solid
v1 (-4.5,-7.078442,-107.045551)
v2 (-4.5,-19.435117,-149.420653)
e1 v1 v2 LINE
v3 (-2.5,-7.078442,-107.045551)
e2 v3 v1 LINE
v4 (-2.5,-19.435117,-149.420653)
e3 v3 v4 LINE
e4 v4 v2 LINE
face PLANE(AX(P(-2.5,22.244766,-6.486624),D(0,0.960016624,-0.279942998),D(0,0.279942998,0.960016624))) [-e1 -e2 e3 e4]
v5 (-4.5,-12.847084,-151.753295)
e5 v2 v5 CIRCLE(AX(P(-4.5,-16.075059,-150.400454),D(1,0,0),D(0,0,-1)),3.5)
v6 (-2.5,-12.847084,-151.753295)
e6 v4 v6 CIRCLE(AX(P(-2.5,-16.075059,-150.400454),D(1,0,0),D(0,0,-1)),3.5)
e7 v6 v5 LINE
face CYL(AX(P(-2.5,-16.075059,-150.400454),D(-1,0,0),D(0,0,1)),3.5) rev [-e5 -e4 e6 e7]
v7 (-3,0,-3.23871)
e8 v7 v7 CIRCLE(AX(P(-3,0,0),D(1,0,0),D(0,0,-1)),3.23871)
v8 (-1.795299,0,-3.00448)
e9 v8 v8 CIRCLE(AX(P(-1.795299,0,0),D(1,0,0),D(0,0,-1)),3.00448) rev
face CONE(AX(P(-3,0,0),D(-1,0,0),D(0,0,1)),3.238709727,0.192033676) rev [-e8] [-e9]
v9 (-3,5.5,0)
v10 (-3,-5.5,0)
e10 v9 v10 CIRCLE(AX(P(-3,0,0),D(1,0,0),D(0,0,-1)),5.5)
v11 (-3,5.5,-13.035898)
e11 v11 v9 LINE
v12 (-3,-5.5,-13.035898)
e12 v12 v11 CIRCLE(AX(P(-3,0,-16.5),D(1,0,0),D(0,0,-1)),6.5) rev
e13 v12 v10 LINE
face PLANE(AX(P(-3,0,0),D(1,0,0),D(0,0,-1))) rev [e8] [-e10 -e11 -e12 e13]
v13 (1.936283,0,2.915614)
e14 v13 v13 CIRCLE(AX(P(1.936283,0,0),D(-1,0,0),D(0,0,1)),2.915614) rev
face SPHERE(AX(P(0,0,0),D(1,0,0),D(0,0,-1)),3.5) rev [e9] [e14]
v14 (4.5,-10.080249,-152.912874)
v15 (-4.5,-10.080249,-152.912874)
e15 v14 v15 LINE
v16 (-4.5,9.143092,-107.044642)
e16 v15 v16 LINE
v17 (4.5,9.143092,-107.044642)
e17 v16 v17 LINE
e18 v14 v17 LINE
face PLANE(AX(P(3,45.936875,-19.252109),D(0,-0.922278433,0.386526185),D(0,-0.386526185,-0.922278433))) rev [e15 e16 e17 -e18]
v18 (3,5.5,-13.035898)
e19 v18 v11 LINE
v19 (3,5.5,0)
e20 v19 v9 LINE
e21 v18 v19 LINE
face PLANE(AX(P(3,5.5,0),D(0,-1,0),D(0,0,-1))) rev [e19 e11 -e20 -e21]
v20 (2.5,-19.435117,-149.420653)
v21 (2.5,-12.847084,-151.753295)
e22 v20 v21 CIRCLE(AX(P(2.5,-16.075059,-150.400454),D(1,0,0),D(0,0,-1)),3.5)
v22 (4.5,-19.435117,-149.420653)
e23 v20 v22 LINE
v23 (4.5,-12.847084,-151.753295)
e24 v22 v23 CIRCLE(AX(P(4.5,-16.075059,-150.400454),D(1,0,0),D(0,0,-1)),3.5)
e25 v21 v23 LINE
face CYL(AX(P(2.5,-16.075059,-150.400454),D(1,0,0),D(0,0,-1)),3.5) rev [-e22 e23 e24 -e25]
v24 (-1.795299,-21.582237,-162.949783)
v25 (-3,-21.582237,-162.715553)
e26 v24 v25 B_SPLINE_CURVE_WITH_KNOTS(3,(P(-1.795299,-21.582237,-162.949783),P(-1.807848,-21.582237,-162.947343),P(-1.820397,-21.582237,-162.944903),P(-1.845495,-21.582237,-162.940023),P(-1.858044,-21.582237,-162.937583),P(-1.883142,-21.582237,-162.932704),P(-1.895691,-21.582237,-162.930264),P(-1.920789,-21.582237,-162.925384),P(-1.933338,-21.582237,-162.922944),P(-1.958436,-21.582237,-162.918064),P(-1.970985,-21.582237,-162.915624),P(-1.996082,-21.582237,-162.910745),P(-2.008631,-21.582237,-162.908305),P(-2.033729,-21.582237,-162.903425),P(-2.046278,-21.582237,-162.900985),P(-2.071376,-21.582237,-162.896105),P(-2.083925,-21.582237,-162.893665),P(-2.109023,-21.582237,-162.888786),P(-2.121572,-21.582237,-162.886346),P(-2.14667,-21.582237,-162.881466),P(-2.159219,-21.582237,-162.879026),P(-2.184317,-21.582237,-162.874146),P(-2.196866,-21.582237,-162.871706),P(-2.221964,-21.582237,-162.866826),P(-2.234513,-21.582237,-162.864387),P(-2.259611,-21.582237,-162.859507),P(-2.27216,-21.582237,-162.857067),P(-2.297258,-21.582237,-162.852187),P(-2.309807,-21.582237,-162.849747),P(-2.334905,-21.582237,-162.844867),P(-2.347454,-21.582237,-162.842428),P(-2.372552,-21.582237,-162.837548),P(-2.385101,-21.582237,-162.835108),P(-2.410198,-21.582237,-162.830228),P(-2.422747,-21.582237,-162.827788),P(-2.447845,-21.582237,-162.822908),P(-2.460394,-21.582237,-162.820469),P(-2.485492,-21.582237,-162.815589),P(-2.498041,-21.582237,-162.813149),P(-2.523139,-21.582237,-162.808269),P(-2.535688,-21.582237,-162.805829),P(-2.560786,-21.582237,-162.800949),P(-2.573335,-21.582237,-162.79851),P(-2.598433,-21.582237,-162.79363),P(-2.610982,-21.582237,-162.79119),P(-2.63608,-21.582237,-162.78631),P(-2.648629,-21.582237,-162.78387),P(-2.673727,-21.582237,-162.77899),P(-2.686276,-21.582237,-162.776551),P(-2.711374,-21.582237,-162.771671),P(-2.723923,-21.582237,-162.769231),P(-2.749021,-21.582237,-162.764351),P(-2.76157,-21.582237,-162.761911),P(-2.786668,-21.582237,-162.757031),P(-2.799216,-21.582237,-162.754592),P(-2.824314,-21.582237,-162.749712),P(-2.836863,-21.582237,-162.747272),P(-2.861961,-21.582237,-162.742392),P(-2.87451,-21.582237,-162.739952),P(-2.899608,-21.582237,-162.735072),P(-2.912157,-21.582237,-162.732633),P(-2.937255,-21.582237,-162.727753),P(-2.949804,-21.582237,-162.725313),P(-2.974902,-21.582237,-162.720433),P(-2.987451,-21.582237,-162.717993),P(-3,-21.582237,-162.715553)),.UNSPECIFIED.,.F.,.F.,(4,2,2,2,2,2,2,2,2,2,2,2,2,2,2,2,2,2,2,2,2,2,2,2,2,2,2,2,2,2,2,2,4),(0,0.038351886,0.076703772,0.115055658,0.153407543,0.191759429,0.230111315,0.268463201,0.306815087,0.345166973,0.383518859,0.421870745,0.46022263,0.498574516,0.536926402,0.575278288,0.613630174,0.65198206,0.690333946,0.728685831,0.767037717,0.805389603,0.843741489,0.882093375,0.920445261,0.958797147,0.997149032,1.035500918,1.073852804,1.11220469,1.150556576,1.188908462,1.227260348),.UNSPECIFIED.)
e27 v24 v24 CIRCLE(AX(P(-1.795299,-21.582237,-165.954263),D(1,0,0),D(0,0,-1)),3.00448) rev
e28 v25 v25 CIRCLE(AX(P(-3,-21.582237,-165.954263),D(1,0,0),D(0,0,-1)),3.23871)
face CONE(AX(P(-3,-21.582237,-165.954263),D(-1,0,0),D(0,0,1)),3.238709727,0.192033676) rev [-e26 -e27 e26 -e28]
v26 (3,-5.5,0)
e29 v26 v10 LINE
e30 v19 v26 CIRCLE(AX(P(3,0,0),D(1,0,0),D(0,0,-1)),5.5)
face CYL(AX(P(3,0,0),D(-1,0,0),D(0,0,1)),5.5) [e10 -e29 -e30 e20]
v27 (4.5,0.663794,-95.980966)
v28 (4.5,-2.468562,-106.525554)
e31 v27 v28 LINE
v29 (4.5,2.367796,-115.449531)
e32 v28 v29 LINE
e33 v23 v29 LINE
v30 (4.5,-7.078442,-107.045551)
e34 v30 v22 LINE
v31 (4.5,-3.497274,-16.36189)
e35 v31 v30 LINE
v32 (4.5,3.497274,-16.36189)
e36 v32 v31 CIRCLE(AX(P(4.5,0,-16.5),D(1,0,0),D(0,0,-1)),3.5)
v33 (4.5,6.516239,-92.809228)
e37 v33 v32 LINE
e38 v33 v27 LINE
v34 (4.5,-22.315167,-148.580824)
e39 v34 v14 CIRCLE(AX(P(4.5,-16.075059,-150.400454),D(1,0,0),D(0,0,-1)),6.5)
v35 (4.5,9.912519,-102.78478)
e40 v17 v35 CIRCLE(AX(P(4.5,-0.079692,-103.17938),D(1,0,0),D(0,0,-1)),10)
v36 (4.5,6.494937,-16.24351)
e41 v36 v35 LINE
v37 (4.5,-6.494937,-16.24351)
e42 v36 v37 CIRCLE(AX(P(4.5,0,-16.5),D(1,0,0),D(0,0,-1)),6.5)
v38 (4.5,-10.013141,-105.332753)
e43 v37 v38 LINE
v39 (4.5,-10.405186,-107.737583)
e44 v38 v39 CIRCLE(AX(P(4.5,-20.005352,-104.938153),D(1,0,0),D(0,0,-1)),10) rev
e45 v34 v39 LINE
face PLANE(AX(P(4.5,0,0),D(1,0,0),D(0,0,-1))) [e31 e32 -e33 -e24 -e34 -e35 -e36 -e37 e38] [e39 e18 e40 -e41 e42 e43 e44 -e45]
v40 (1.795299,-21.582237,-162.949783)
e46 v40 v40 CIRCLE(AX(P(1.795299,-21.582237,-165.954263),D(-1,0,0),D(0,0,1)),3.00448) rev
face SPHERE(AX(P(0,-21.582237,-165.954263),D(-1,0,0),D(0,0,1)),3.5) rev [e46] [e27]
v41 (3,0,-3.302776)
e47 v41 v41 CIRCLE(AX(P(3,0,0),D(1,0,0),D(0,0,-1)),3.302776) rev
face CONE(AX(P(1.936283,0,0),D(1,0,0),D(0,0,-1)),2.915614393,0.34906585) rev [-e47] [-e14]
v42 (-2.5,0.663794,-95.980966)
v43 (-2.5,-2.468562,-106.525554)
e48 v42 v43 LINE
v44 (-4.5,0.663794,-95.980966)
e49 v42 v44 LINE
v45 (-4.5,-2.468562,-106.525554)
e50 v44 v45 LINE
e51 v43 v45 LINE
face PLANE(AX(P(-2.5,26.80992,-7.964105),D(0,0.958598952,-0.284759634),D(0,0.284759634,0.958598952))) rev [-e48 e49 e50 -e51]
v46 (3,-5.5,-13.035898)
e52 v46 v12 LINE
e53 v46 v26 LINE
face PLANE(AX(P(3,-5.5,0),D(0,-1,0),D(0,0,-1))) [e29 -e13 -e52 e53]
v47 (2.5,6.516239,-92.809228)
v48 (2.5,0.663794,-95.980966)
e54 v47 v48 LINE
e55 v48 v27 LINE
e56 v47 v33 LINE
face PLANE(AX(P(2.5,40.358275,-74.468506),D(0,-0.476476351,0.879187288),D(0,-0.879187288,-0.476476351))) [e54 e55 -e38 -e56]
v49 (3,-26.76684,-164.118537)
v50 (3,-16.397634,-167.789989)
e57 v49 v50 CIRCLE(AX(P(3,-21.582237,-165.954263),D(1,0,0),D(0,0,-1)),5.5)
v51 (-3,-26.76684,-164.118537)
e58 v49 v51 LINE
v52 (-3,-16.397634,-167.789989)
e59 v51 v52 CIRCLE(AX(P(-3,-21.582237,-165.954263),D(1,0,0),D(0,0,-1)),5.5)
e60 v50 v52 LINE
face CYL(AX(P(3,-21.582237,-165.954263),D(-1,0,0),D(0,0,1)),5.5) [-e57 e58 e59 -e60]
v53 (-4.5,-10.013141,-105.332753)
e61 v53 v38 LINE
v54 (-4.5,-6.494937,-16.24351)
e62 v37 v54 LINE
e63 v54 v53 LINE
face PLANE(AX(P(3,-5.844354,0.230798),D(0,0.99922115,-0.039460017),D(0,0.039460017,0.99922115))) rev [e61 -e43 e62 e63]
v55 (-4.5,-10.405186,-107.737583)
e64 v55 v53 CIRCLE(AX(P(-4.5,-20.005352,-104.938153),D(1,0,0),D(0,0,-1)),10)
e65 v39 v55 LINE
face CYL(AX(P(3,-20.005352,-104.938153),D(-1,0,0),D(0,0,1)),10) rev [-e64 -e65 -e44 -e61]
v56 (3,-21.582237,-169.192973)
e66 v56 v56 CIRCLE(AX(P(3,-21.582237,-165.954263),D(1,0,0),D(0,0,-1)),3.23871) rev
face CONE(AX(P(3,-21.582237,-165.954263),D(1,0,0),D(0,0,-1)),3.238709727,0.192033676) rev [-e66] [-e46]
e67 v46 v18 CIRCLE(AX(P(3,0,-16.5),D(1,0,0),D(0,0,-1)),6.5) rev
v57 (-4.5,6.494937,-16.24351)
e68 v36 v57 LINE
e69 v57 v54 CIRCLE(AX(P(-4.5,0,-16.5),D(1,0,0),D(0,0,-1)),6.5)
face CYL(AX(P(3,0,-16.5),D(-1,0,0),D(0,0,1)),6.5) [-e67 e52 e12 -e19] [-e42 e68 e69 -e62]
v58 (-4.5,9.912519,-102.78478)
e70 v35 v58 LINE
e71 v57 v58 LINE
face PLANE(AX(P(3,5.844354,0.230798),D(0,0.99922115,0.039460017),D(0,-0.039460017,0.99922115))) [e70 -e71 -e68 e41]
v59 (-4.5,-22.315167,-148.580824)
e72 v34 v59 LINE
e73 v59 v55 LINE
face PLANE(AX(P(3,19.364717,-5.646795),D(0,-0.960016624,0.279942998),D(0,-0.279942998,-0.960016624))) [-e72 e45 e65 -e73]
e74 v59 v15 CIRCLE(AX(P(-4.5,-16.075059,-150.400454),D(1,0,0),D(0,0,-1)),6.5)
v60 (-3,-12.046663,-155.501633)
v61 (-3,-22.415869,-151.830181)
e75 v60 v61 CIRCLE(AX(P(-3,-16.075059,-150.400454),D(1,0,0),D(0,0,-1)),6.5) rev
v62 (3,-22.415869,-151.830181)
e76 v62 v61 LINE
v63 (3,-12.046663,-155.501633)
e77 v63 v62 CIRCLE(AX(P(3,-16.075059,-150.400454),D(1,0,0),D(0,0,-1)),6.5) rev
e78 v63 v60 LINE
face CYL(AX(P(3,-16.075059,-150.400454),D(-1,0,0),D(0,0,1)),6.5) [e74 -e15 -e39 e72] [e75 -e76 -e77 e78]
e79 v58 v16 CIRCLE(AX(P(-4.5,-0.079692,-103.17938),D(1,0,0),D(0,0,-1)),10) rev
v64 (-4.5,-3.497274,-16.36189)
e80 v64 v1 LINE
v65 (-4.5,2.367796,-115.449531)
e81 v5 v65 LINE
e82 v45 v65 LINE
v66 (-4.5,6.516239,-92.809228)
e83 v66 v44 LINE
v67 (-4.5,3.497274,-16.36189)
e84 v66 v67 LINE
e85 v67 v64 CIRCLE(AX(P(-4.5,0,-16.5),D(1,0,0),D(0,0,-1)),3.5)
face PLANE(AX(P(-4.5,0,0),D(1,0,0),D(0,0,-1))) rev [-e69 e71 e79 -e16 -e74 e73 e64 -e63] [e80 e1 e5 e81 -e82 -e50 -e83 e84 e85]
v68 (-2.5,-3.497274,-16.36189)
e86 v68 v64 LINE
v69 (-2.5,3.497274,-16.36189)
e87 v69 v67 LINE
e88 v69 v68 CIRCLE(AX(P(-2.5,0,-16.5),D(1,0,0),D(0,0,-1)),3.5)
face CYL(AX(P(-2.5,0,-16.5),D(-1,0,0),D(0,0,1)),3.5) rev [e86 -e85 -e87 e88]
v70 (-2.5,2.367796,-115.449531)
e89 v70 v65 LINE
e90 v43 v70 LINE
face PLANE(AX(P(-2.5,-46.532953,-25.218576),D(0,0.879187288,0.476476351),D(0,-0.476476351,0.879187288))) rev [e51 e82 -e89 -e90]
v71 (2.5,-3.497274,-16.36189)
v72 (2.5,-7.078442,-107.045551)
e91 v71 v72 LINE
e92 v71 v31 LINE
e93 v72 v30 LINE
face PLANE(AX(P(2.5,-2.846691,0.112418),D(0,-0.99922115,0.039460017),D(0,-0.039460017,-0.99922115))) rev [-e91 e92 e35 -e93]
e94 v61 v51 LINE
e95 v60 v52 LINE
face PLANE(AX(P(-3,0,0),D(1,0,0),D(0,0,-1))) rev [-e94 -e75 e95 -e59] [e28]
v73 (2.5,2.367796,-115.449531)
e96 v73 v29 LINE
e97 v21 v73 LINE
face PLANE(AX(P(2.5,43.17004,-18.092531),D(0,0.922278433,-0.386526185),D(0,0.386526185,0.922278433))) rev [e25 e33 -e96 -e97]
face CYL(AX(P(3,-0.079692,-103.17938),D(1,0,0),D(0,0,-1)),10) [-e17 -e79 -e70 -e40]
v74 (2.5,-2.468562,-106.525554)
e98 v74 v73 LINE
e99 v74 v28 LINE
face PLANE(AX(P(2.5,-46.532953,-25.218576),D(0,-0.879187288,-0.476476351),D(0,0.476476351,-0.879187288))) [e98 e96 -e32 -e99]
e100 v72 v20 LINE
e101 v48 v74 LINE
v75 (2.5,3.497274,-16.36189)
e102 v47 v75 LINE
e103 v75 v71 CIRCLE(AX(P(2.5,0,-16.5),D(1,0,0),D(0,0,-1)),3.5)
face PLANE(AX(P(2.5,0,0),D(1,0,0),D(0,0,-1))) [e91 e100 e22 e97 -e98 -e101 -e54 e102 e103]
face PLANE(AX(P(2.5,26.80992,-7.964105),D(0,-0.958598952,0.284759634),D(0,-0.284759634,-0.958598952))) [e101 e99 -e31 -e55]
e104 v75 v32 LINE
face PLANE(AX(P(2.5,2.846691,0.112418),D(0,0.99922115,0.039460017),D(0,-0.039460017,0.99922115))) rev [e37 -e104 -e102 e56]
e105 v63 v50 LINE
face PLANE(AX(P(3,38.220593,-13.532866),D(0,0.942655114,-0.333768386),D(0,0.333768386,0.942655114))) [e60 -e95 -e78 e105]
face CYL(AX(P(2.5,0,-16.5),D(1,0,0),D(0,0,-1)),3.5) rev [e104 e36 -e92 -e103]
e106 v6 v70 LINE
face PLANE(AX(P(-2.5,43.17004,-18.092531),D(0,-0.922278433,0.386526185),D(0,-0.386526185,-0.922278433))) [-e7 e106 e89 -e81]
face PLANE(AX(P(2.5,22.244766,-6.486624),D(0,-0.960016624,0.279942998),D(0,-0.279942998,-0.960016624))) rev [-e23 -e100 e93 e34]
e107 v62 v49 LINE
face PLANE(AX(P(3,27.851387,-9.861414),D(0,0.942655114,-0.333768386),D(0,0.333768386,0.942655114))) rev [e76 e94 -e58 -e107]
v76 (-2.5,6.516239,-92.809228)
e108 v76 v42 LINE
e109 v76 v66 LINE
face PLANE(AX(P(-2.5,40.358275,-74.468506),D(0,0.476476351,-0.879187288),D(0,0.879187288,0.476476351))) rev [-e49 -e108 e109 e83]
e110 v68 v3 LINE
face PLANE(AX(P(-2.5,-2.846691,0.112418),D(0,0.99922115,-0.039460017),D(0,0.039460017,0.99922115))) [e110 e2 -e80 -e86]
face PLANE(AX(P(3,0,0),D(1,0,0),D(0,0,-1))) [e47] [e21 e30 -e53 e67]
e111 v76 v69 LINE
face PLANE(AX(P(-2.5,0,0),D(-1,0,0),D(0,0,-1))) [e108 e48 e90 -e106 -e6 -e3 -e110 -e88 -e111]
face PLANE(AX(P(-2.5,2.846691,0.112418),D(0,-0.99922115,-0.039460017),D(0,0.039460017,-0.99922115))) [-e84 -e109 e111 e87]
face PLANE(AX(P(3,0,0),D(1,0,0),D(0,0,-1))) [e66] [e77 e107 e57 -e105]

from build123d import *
from build123d.topology import SkipClean

# Parameters (mm, degrees)
SKETCH1_R           = 3.25
BOSS_EXTRUDE1_DEPTH = 3
BOSS_EXTRUDE2_START = -4.5
BOSS_EXTRUDE2_DEPTH = 9
CUT_EXTRUDE1_DEPTH  = 2
FILLET1_R           = 10
CUT_EXTRUDE2_DEPTH  = 17
CHAMFER1_SIZE       = 1.5
CHAMFER1_SIZE_2     = 1.435934089
CUT_EXTRUDE3_DEPTH  = 17
CHAMFER2_SIZE       = 1.435934089


with BuildPart() as part:
    # Sketch1 → Boss-Extrude1 (new, symmetric)
    with BuildSketch(Plane(origin=(0, 0, 0), x_dir=(0, 0, -1), z_dir=(1, 0, 0))):
        with BuildLine():
            Line((105, 10), (16.24350989, 6.494937476))
            ThreePointArc((16.24350989, 6.494937476), (14.574337558, 6.208206195), (13.035898385, 5.5))
            Line((13.035898385, 5.5), (0, 5.5))
            ThreePointArc((0, 5.5), (-5.5, 0), (0, -5.5))
            Line((0, -5.5), (13.035898385, -5.5))
            ThreePointArc((13.035898385, -5.5), (14.574337558, -6.208206195), (16.24350989, -6.494937476))
            Line((16.24350989, -6.494937476), (106.559228351, -10.061575135))
            Line((106.559228351, -10.061575135), (148.580824133, -22.31516659))
            ThreePointArc((148.580824133, -22.31516659), (150.199105044, -22.57193923), (151.830180598, -22.41586927))
            Line((151.830180598, -22.41586927), (164.118536879, -26.766840037))
            ThreePointArc((164.118536879, -26.766840037), (171.138866131, -23.417963033), (167.789989128, -16.397633781))
            Line((167.789989128, -16.397633781), (155.501632847, -12.046663013))
            ThreePointArc((155.501632847, -12.046663013), (154.332173391, -10.899000225), (152.912873821, -10.08024872))
            Line((152.912873821, -10.08024872), (105, 10))
        make_face()
        Circle(SKETCH1_R, mode=Mode.SUBTRACT)
        with Locations((165.954263003, -21.582236909)):
            Circle(SKETCH1_R, mode=Mode.SUBTRACT)
    extrude(amount=BOSS_EXTRUDE1_DEPTH, both=True)

    # Boss-Extrude2: read off the stored shape, not the designer's step
    # Boss-Extrude2 outline → Boss-Extrude2 (add)
    with SkipClean():  # the faces are left unmerged after this step: merging them gives an invalid solid
        with BuildSketch(Plane(origin=(0, 0, 0), x_dir=(0, 0, -1), z_dir=(1, 0, 0)).offset(BOSS_EXTRUDE2_START)):
            with BuildLine():
                ThreePointArc((148.580824133, -22.31516659), (156.527711861, -18.244553046), (152.912873821, -10.08024872))
                Line((152.912873821, -10.08024872), (105, 10))
                Line((105, 10), (16.24350989, 6.494937476))
                ThreePointArc((16.24350989, 6.494937476), (10, 0), (16.24350989, -6.494937476))
                Line((16.24350989, -6.494937476), (106.559228351, -10.061575135))
                Line((106.559228351, -10.061575135), (148.580824133, -22.31516659))
            make_face()
        extrude(amount=BOSS_EXTRUDE2_DEPTH)

    # Sketch2 → Cut-Extrude1 (cut)
    with SkipClean():  # the faces are left unmerged after this step: merging them gives an invalid solid
        with BuildSketch(Plane(origin=(4.5, 0, 0), x_dir=(0, 0, -1), z_dir=(1, 0, 0))):
            with BuildLine():
                Line((95.980965998, 0.663794286), (92.809228462, 6.516238621))
                Line((92.809228462, 6.516238621), (16.361889941, 3.497274026))
                ThreePointArc((16.361889941, 3.497274026), (13, 0), (16.361889941, -3.497274026))
                Line((16.361889941, -3.497274026), (107.045551003, -7.078442023))
                Line((107.045551003, -7.078442023), (149.420653126, -19.435116719))
                ThreePointArc((149.420653126, -19.435116719), (153.699746519, -17.243247888), (151.753295266, -12.847084019))
                Line((151.753295266, -12.847084019), (115.449531272, 2.367795664))
                Line((115.449531272, 2.367795664), (106.52555447, -2.46856169))
                Line((106.52555447, -2.46856169), (95.980965998, 0.663794286))
            make_face()
        cut_extrude1 = extrude(amount=-CUT_EXTRUDE1_DEPTH, mode=Mode.SUBTRACT)

    # Mirror1: Cut-Extrude1 across plane
    with SkipClean():  # the faces are left unmerged after this step: merging them gives an invalid solid
        add(cut_extrude1.mirror(Plane(origin=(0, 0, 0), x_dir=(0, 0, 1), z_dir=(1, 0, 0))), mode=Mode.SUBTRACT)

    # Fillet1
    fillet1_edges = [part.edges().sort_by_distance(p)[0] for p in [
        (0, -10.061575135, -106.559228351),
        (0, 10, -105),
    ]]
    fillet(fillet1_edges, radius=FILLET1_R)

    # Sketch3 → Revolve1 (revolve)
    with SkipClean():  # the faces are left unmerged after this step: merging them gives an invalid solid
        with BuildSketch(Plane(origin=(0, 0, 0), x_dir=(0, 0, -1), z_dir=(1, 0, 0))):
            with BuildLine():
                ThreePointArc((4.5, 0), (0, 4.5), (-4.5, 0))
                Line((-4.5, 0), (-3.5, 0))
                ThreePointArc((-3.5, 0), (0, 3.5), (3.5, 0))
                Line((3.5, 0), (4.5, 0))
            make_face()
        revolve(axis=Axis((0, 0, 4.5), (0, 0, -1)))

    # Sketch4 → Cut-Extrude2 (cut)
    with SkipClean():  # the faces are left unmerged after this step: merging them gives an invalid solid
        with BuildSketch(Plane(origin=(0, 5.5, 0), x_dir=(1, 0, 0), z_dir=(0, 1, 0))):
            Polygon((3, 0), (3, -6.291238928), (6.747077204, -6.291238928), (6.747077204, 6.985365783), (3, 6.985365783), align=None)
            Polygon((-5.881309599, 6.985365783), (-5.881309599, -6.291238928), (-3, -6.291238928), (-3, 0), (-3, 6.985365783), align=None)
        extrude(amount=-CUT_EXTRUDE2_DEPTH, mode=Mode.SUBTRACT)

    # Chamfer1
    # the kernel refuses this chamfer: 1.5, 1.435934089 mm, written as the material it takes off along each edge
    with BuildSketch(Plane(origin=(3, 0, 0), x_dir=(0, 0, -1), z_dir=(0, 1, 0))) as chamfer1_piece_1:
        with BuildLine():
            Line((1.802775638 + CHAMFER1_SIZE, 0), (2.915614393, 1.063716779))
            ThreePointArc((2.915614393, 1.063716779), (2.427398497, 0.478544758), (1.802775638, 0))
            Line((1.802775638, 0), (1.802775638 + CHAMFER1_SIZE, 0))
        make_face()
    revolve(axis=Axis((3, 0, 0), (-1, 0, 0)), mode=Mode.SUBTRACT)
    with BuildSketch(Plane(origin=(-3, 0, 0), x_dir=(0, 0, 1), z_dir=(0, 1, 0))) as chamfer1_piece_2:
        with BuildLine():
            Line((1.802775638 + CHAMFER1_SIZE_2, 0), (3.00448024, 1.204701004))
            ThreePointArc((3.00448024, 1.204701004), (2.490248254, 0.540596895), (1.802775638, 0))
            Line((1.802775638, 0), (1.802775638 + CHAMFER1_SIZE_2, 0))
        make_face()
    revolve(axis=Axis((-3, 0, 0), (1, 0, 0)), mode=Mode.SUBTRACT)

    # Sketch5 → Revolve2 (revolve)
    with SkipClean():  # the faces are left unmerged after this step: merging them gives an invalid solid
        with BuildSketch(Plane(origin=(0, 0, 0), x_dir=(0, 0, -1), z_dir=(1, 0, 0))):
            with BuildLine():
                Line((169.454263003, -21.582236909), (170.454263003, -21.582236909))
                ThreePointArc((170.454263003, -21.582236909), (165.954263003, -17.082236909), (161.454263003, -21.582236909))
                Line((161.454263003, -21.582236909), (162.454263003, -21.582236909))
                ThreePointArc((162.454263003, -21.582236909), (165.954263003, -18.082236909), (169.454263003, -21.582236909))
            make_face()
        revolve(axis=Axis((0, -21.582236909, -170.454263003), (0, 0, 1)))

    # Sketch6 → Cut-Extrude3 (cut)
    with SkipClean():  # the faces are left unmerged after this step: merging them gives an invalid solid
        with BuildSketch(Plane(origin=(0, 38.220593136, -13.532866369), x_dir=(1, 0, 0), z_dir=(0, 0.9426551142039149, -0.33376838625790206))):
            Polygon((-6.767171252, 154.311979975), (-3, 154.311979975), (-3, 163.641103129), (-3, 169.141103129), (3, 169.141103129), (3, 154.311979975), (6.783794008, 154.311979975), (6.783794008, 170.859793321), (-6.767171252, 170.859793321), align=None)
        extrude(amount=-CUT_EXTRUDE3_DEPTH, mode=Mode.SUBTRACT)

    # Chamfer2
    # the kernel refuses this chamfer: 1.5, 1.435934089 mm, written as the material it takes off along each edge
    with BuildSketch(Plane(origin=(3, -21.582236909, -165.954263003), x_dir=(0, 0, -1), z_dir=(0, 1, 0))) as chamfer2_piece_1:
        with BuildLine():
            Line((1.802775638 + CHAMFER2_SIZE, 0), (3.00448024, 1.204701004))
            ThreePointArc((3.00448024, 1.204701004), (2.490248254, 0.540596895), (1.802775638, 0))
            Line((1.802775638, 0), (1.802775638 + CHAMFER2_SIZE, 0))
        make_face()
    revolve(axis=Axis((3, -21.582236909, -165.954263003), (-1, 0, 0)), mode=Mode.SUBTRACT)
    with BuildSketch(Plane(origin=(-3, -21.582236909, -165.954263003), x_dir=(0, 0, 1), z_dir=(0, 1, 0))) as chamfer2_piece_2:
        with BuildLine():
            Line((1.802775638 + CHAMFER2_SIZE, 0), (3.00448024, 1.204701004))
            ThreePointArc((3.00448024, 1.204701004), (2.490248254, 0.540596895), (1.802775638, 0))
            Line((1.802775638, 0), (1.802775638 + CHAMFER2_SIZE, 0))
        make_face()
    revolve(axis=Axis((-3, -21.582236909, -165.954263003), (1, 0, 0)), mode=Mode.SUBTRACT)

    # Sketch5<6> → Cut-Revolve1 (revolve, cut)
    with SkipClean():  # the faces are left unmerged after this step: merging them gives an invalid solid
        with BuildSketch(Plane(origin=(0, 0, 0), x_dir=(0, 0, -1), z_dir=(1, 0, 0))):
            with BuildLine():
                Line((162.454263003, -21.582236909), (169.454263003, -21.582236909))
                ThreePointArc((169.454263003, -21.582236909), (165.954263003, -18.082236909), (162.454263003, -21.582236909))
            make_face()
        revolve(axis=Axis((0, -21.582236909, -170.454263003), (0, 0, 1)), mode=Mode.SUBTRACT)

    # Sketch3<6> → Cut-Revolve2 (revolve, cut)
    with SkipClean():  # the faces are left unmerged after this step: merging them gives an invalid solid
        with BuildSketch(Plane(origin=(0, 0, 0), x_dir=(0, 0, -1), z_dir=(1, 0, 0))):
            with BuildLine():
                ThreePointArc((3.5, 0), (0, 3.5), (-3.5, 0))
                Line((-3.5, 0), (3.5, 0))
            make_face()
        revolve(axis=Axis((0, 0, 4.5), (0, 0, -1)), mode=Mode.SUBTRACT)


solid = part.part
